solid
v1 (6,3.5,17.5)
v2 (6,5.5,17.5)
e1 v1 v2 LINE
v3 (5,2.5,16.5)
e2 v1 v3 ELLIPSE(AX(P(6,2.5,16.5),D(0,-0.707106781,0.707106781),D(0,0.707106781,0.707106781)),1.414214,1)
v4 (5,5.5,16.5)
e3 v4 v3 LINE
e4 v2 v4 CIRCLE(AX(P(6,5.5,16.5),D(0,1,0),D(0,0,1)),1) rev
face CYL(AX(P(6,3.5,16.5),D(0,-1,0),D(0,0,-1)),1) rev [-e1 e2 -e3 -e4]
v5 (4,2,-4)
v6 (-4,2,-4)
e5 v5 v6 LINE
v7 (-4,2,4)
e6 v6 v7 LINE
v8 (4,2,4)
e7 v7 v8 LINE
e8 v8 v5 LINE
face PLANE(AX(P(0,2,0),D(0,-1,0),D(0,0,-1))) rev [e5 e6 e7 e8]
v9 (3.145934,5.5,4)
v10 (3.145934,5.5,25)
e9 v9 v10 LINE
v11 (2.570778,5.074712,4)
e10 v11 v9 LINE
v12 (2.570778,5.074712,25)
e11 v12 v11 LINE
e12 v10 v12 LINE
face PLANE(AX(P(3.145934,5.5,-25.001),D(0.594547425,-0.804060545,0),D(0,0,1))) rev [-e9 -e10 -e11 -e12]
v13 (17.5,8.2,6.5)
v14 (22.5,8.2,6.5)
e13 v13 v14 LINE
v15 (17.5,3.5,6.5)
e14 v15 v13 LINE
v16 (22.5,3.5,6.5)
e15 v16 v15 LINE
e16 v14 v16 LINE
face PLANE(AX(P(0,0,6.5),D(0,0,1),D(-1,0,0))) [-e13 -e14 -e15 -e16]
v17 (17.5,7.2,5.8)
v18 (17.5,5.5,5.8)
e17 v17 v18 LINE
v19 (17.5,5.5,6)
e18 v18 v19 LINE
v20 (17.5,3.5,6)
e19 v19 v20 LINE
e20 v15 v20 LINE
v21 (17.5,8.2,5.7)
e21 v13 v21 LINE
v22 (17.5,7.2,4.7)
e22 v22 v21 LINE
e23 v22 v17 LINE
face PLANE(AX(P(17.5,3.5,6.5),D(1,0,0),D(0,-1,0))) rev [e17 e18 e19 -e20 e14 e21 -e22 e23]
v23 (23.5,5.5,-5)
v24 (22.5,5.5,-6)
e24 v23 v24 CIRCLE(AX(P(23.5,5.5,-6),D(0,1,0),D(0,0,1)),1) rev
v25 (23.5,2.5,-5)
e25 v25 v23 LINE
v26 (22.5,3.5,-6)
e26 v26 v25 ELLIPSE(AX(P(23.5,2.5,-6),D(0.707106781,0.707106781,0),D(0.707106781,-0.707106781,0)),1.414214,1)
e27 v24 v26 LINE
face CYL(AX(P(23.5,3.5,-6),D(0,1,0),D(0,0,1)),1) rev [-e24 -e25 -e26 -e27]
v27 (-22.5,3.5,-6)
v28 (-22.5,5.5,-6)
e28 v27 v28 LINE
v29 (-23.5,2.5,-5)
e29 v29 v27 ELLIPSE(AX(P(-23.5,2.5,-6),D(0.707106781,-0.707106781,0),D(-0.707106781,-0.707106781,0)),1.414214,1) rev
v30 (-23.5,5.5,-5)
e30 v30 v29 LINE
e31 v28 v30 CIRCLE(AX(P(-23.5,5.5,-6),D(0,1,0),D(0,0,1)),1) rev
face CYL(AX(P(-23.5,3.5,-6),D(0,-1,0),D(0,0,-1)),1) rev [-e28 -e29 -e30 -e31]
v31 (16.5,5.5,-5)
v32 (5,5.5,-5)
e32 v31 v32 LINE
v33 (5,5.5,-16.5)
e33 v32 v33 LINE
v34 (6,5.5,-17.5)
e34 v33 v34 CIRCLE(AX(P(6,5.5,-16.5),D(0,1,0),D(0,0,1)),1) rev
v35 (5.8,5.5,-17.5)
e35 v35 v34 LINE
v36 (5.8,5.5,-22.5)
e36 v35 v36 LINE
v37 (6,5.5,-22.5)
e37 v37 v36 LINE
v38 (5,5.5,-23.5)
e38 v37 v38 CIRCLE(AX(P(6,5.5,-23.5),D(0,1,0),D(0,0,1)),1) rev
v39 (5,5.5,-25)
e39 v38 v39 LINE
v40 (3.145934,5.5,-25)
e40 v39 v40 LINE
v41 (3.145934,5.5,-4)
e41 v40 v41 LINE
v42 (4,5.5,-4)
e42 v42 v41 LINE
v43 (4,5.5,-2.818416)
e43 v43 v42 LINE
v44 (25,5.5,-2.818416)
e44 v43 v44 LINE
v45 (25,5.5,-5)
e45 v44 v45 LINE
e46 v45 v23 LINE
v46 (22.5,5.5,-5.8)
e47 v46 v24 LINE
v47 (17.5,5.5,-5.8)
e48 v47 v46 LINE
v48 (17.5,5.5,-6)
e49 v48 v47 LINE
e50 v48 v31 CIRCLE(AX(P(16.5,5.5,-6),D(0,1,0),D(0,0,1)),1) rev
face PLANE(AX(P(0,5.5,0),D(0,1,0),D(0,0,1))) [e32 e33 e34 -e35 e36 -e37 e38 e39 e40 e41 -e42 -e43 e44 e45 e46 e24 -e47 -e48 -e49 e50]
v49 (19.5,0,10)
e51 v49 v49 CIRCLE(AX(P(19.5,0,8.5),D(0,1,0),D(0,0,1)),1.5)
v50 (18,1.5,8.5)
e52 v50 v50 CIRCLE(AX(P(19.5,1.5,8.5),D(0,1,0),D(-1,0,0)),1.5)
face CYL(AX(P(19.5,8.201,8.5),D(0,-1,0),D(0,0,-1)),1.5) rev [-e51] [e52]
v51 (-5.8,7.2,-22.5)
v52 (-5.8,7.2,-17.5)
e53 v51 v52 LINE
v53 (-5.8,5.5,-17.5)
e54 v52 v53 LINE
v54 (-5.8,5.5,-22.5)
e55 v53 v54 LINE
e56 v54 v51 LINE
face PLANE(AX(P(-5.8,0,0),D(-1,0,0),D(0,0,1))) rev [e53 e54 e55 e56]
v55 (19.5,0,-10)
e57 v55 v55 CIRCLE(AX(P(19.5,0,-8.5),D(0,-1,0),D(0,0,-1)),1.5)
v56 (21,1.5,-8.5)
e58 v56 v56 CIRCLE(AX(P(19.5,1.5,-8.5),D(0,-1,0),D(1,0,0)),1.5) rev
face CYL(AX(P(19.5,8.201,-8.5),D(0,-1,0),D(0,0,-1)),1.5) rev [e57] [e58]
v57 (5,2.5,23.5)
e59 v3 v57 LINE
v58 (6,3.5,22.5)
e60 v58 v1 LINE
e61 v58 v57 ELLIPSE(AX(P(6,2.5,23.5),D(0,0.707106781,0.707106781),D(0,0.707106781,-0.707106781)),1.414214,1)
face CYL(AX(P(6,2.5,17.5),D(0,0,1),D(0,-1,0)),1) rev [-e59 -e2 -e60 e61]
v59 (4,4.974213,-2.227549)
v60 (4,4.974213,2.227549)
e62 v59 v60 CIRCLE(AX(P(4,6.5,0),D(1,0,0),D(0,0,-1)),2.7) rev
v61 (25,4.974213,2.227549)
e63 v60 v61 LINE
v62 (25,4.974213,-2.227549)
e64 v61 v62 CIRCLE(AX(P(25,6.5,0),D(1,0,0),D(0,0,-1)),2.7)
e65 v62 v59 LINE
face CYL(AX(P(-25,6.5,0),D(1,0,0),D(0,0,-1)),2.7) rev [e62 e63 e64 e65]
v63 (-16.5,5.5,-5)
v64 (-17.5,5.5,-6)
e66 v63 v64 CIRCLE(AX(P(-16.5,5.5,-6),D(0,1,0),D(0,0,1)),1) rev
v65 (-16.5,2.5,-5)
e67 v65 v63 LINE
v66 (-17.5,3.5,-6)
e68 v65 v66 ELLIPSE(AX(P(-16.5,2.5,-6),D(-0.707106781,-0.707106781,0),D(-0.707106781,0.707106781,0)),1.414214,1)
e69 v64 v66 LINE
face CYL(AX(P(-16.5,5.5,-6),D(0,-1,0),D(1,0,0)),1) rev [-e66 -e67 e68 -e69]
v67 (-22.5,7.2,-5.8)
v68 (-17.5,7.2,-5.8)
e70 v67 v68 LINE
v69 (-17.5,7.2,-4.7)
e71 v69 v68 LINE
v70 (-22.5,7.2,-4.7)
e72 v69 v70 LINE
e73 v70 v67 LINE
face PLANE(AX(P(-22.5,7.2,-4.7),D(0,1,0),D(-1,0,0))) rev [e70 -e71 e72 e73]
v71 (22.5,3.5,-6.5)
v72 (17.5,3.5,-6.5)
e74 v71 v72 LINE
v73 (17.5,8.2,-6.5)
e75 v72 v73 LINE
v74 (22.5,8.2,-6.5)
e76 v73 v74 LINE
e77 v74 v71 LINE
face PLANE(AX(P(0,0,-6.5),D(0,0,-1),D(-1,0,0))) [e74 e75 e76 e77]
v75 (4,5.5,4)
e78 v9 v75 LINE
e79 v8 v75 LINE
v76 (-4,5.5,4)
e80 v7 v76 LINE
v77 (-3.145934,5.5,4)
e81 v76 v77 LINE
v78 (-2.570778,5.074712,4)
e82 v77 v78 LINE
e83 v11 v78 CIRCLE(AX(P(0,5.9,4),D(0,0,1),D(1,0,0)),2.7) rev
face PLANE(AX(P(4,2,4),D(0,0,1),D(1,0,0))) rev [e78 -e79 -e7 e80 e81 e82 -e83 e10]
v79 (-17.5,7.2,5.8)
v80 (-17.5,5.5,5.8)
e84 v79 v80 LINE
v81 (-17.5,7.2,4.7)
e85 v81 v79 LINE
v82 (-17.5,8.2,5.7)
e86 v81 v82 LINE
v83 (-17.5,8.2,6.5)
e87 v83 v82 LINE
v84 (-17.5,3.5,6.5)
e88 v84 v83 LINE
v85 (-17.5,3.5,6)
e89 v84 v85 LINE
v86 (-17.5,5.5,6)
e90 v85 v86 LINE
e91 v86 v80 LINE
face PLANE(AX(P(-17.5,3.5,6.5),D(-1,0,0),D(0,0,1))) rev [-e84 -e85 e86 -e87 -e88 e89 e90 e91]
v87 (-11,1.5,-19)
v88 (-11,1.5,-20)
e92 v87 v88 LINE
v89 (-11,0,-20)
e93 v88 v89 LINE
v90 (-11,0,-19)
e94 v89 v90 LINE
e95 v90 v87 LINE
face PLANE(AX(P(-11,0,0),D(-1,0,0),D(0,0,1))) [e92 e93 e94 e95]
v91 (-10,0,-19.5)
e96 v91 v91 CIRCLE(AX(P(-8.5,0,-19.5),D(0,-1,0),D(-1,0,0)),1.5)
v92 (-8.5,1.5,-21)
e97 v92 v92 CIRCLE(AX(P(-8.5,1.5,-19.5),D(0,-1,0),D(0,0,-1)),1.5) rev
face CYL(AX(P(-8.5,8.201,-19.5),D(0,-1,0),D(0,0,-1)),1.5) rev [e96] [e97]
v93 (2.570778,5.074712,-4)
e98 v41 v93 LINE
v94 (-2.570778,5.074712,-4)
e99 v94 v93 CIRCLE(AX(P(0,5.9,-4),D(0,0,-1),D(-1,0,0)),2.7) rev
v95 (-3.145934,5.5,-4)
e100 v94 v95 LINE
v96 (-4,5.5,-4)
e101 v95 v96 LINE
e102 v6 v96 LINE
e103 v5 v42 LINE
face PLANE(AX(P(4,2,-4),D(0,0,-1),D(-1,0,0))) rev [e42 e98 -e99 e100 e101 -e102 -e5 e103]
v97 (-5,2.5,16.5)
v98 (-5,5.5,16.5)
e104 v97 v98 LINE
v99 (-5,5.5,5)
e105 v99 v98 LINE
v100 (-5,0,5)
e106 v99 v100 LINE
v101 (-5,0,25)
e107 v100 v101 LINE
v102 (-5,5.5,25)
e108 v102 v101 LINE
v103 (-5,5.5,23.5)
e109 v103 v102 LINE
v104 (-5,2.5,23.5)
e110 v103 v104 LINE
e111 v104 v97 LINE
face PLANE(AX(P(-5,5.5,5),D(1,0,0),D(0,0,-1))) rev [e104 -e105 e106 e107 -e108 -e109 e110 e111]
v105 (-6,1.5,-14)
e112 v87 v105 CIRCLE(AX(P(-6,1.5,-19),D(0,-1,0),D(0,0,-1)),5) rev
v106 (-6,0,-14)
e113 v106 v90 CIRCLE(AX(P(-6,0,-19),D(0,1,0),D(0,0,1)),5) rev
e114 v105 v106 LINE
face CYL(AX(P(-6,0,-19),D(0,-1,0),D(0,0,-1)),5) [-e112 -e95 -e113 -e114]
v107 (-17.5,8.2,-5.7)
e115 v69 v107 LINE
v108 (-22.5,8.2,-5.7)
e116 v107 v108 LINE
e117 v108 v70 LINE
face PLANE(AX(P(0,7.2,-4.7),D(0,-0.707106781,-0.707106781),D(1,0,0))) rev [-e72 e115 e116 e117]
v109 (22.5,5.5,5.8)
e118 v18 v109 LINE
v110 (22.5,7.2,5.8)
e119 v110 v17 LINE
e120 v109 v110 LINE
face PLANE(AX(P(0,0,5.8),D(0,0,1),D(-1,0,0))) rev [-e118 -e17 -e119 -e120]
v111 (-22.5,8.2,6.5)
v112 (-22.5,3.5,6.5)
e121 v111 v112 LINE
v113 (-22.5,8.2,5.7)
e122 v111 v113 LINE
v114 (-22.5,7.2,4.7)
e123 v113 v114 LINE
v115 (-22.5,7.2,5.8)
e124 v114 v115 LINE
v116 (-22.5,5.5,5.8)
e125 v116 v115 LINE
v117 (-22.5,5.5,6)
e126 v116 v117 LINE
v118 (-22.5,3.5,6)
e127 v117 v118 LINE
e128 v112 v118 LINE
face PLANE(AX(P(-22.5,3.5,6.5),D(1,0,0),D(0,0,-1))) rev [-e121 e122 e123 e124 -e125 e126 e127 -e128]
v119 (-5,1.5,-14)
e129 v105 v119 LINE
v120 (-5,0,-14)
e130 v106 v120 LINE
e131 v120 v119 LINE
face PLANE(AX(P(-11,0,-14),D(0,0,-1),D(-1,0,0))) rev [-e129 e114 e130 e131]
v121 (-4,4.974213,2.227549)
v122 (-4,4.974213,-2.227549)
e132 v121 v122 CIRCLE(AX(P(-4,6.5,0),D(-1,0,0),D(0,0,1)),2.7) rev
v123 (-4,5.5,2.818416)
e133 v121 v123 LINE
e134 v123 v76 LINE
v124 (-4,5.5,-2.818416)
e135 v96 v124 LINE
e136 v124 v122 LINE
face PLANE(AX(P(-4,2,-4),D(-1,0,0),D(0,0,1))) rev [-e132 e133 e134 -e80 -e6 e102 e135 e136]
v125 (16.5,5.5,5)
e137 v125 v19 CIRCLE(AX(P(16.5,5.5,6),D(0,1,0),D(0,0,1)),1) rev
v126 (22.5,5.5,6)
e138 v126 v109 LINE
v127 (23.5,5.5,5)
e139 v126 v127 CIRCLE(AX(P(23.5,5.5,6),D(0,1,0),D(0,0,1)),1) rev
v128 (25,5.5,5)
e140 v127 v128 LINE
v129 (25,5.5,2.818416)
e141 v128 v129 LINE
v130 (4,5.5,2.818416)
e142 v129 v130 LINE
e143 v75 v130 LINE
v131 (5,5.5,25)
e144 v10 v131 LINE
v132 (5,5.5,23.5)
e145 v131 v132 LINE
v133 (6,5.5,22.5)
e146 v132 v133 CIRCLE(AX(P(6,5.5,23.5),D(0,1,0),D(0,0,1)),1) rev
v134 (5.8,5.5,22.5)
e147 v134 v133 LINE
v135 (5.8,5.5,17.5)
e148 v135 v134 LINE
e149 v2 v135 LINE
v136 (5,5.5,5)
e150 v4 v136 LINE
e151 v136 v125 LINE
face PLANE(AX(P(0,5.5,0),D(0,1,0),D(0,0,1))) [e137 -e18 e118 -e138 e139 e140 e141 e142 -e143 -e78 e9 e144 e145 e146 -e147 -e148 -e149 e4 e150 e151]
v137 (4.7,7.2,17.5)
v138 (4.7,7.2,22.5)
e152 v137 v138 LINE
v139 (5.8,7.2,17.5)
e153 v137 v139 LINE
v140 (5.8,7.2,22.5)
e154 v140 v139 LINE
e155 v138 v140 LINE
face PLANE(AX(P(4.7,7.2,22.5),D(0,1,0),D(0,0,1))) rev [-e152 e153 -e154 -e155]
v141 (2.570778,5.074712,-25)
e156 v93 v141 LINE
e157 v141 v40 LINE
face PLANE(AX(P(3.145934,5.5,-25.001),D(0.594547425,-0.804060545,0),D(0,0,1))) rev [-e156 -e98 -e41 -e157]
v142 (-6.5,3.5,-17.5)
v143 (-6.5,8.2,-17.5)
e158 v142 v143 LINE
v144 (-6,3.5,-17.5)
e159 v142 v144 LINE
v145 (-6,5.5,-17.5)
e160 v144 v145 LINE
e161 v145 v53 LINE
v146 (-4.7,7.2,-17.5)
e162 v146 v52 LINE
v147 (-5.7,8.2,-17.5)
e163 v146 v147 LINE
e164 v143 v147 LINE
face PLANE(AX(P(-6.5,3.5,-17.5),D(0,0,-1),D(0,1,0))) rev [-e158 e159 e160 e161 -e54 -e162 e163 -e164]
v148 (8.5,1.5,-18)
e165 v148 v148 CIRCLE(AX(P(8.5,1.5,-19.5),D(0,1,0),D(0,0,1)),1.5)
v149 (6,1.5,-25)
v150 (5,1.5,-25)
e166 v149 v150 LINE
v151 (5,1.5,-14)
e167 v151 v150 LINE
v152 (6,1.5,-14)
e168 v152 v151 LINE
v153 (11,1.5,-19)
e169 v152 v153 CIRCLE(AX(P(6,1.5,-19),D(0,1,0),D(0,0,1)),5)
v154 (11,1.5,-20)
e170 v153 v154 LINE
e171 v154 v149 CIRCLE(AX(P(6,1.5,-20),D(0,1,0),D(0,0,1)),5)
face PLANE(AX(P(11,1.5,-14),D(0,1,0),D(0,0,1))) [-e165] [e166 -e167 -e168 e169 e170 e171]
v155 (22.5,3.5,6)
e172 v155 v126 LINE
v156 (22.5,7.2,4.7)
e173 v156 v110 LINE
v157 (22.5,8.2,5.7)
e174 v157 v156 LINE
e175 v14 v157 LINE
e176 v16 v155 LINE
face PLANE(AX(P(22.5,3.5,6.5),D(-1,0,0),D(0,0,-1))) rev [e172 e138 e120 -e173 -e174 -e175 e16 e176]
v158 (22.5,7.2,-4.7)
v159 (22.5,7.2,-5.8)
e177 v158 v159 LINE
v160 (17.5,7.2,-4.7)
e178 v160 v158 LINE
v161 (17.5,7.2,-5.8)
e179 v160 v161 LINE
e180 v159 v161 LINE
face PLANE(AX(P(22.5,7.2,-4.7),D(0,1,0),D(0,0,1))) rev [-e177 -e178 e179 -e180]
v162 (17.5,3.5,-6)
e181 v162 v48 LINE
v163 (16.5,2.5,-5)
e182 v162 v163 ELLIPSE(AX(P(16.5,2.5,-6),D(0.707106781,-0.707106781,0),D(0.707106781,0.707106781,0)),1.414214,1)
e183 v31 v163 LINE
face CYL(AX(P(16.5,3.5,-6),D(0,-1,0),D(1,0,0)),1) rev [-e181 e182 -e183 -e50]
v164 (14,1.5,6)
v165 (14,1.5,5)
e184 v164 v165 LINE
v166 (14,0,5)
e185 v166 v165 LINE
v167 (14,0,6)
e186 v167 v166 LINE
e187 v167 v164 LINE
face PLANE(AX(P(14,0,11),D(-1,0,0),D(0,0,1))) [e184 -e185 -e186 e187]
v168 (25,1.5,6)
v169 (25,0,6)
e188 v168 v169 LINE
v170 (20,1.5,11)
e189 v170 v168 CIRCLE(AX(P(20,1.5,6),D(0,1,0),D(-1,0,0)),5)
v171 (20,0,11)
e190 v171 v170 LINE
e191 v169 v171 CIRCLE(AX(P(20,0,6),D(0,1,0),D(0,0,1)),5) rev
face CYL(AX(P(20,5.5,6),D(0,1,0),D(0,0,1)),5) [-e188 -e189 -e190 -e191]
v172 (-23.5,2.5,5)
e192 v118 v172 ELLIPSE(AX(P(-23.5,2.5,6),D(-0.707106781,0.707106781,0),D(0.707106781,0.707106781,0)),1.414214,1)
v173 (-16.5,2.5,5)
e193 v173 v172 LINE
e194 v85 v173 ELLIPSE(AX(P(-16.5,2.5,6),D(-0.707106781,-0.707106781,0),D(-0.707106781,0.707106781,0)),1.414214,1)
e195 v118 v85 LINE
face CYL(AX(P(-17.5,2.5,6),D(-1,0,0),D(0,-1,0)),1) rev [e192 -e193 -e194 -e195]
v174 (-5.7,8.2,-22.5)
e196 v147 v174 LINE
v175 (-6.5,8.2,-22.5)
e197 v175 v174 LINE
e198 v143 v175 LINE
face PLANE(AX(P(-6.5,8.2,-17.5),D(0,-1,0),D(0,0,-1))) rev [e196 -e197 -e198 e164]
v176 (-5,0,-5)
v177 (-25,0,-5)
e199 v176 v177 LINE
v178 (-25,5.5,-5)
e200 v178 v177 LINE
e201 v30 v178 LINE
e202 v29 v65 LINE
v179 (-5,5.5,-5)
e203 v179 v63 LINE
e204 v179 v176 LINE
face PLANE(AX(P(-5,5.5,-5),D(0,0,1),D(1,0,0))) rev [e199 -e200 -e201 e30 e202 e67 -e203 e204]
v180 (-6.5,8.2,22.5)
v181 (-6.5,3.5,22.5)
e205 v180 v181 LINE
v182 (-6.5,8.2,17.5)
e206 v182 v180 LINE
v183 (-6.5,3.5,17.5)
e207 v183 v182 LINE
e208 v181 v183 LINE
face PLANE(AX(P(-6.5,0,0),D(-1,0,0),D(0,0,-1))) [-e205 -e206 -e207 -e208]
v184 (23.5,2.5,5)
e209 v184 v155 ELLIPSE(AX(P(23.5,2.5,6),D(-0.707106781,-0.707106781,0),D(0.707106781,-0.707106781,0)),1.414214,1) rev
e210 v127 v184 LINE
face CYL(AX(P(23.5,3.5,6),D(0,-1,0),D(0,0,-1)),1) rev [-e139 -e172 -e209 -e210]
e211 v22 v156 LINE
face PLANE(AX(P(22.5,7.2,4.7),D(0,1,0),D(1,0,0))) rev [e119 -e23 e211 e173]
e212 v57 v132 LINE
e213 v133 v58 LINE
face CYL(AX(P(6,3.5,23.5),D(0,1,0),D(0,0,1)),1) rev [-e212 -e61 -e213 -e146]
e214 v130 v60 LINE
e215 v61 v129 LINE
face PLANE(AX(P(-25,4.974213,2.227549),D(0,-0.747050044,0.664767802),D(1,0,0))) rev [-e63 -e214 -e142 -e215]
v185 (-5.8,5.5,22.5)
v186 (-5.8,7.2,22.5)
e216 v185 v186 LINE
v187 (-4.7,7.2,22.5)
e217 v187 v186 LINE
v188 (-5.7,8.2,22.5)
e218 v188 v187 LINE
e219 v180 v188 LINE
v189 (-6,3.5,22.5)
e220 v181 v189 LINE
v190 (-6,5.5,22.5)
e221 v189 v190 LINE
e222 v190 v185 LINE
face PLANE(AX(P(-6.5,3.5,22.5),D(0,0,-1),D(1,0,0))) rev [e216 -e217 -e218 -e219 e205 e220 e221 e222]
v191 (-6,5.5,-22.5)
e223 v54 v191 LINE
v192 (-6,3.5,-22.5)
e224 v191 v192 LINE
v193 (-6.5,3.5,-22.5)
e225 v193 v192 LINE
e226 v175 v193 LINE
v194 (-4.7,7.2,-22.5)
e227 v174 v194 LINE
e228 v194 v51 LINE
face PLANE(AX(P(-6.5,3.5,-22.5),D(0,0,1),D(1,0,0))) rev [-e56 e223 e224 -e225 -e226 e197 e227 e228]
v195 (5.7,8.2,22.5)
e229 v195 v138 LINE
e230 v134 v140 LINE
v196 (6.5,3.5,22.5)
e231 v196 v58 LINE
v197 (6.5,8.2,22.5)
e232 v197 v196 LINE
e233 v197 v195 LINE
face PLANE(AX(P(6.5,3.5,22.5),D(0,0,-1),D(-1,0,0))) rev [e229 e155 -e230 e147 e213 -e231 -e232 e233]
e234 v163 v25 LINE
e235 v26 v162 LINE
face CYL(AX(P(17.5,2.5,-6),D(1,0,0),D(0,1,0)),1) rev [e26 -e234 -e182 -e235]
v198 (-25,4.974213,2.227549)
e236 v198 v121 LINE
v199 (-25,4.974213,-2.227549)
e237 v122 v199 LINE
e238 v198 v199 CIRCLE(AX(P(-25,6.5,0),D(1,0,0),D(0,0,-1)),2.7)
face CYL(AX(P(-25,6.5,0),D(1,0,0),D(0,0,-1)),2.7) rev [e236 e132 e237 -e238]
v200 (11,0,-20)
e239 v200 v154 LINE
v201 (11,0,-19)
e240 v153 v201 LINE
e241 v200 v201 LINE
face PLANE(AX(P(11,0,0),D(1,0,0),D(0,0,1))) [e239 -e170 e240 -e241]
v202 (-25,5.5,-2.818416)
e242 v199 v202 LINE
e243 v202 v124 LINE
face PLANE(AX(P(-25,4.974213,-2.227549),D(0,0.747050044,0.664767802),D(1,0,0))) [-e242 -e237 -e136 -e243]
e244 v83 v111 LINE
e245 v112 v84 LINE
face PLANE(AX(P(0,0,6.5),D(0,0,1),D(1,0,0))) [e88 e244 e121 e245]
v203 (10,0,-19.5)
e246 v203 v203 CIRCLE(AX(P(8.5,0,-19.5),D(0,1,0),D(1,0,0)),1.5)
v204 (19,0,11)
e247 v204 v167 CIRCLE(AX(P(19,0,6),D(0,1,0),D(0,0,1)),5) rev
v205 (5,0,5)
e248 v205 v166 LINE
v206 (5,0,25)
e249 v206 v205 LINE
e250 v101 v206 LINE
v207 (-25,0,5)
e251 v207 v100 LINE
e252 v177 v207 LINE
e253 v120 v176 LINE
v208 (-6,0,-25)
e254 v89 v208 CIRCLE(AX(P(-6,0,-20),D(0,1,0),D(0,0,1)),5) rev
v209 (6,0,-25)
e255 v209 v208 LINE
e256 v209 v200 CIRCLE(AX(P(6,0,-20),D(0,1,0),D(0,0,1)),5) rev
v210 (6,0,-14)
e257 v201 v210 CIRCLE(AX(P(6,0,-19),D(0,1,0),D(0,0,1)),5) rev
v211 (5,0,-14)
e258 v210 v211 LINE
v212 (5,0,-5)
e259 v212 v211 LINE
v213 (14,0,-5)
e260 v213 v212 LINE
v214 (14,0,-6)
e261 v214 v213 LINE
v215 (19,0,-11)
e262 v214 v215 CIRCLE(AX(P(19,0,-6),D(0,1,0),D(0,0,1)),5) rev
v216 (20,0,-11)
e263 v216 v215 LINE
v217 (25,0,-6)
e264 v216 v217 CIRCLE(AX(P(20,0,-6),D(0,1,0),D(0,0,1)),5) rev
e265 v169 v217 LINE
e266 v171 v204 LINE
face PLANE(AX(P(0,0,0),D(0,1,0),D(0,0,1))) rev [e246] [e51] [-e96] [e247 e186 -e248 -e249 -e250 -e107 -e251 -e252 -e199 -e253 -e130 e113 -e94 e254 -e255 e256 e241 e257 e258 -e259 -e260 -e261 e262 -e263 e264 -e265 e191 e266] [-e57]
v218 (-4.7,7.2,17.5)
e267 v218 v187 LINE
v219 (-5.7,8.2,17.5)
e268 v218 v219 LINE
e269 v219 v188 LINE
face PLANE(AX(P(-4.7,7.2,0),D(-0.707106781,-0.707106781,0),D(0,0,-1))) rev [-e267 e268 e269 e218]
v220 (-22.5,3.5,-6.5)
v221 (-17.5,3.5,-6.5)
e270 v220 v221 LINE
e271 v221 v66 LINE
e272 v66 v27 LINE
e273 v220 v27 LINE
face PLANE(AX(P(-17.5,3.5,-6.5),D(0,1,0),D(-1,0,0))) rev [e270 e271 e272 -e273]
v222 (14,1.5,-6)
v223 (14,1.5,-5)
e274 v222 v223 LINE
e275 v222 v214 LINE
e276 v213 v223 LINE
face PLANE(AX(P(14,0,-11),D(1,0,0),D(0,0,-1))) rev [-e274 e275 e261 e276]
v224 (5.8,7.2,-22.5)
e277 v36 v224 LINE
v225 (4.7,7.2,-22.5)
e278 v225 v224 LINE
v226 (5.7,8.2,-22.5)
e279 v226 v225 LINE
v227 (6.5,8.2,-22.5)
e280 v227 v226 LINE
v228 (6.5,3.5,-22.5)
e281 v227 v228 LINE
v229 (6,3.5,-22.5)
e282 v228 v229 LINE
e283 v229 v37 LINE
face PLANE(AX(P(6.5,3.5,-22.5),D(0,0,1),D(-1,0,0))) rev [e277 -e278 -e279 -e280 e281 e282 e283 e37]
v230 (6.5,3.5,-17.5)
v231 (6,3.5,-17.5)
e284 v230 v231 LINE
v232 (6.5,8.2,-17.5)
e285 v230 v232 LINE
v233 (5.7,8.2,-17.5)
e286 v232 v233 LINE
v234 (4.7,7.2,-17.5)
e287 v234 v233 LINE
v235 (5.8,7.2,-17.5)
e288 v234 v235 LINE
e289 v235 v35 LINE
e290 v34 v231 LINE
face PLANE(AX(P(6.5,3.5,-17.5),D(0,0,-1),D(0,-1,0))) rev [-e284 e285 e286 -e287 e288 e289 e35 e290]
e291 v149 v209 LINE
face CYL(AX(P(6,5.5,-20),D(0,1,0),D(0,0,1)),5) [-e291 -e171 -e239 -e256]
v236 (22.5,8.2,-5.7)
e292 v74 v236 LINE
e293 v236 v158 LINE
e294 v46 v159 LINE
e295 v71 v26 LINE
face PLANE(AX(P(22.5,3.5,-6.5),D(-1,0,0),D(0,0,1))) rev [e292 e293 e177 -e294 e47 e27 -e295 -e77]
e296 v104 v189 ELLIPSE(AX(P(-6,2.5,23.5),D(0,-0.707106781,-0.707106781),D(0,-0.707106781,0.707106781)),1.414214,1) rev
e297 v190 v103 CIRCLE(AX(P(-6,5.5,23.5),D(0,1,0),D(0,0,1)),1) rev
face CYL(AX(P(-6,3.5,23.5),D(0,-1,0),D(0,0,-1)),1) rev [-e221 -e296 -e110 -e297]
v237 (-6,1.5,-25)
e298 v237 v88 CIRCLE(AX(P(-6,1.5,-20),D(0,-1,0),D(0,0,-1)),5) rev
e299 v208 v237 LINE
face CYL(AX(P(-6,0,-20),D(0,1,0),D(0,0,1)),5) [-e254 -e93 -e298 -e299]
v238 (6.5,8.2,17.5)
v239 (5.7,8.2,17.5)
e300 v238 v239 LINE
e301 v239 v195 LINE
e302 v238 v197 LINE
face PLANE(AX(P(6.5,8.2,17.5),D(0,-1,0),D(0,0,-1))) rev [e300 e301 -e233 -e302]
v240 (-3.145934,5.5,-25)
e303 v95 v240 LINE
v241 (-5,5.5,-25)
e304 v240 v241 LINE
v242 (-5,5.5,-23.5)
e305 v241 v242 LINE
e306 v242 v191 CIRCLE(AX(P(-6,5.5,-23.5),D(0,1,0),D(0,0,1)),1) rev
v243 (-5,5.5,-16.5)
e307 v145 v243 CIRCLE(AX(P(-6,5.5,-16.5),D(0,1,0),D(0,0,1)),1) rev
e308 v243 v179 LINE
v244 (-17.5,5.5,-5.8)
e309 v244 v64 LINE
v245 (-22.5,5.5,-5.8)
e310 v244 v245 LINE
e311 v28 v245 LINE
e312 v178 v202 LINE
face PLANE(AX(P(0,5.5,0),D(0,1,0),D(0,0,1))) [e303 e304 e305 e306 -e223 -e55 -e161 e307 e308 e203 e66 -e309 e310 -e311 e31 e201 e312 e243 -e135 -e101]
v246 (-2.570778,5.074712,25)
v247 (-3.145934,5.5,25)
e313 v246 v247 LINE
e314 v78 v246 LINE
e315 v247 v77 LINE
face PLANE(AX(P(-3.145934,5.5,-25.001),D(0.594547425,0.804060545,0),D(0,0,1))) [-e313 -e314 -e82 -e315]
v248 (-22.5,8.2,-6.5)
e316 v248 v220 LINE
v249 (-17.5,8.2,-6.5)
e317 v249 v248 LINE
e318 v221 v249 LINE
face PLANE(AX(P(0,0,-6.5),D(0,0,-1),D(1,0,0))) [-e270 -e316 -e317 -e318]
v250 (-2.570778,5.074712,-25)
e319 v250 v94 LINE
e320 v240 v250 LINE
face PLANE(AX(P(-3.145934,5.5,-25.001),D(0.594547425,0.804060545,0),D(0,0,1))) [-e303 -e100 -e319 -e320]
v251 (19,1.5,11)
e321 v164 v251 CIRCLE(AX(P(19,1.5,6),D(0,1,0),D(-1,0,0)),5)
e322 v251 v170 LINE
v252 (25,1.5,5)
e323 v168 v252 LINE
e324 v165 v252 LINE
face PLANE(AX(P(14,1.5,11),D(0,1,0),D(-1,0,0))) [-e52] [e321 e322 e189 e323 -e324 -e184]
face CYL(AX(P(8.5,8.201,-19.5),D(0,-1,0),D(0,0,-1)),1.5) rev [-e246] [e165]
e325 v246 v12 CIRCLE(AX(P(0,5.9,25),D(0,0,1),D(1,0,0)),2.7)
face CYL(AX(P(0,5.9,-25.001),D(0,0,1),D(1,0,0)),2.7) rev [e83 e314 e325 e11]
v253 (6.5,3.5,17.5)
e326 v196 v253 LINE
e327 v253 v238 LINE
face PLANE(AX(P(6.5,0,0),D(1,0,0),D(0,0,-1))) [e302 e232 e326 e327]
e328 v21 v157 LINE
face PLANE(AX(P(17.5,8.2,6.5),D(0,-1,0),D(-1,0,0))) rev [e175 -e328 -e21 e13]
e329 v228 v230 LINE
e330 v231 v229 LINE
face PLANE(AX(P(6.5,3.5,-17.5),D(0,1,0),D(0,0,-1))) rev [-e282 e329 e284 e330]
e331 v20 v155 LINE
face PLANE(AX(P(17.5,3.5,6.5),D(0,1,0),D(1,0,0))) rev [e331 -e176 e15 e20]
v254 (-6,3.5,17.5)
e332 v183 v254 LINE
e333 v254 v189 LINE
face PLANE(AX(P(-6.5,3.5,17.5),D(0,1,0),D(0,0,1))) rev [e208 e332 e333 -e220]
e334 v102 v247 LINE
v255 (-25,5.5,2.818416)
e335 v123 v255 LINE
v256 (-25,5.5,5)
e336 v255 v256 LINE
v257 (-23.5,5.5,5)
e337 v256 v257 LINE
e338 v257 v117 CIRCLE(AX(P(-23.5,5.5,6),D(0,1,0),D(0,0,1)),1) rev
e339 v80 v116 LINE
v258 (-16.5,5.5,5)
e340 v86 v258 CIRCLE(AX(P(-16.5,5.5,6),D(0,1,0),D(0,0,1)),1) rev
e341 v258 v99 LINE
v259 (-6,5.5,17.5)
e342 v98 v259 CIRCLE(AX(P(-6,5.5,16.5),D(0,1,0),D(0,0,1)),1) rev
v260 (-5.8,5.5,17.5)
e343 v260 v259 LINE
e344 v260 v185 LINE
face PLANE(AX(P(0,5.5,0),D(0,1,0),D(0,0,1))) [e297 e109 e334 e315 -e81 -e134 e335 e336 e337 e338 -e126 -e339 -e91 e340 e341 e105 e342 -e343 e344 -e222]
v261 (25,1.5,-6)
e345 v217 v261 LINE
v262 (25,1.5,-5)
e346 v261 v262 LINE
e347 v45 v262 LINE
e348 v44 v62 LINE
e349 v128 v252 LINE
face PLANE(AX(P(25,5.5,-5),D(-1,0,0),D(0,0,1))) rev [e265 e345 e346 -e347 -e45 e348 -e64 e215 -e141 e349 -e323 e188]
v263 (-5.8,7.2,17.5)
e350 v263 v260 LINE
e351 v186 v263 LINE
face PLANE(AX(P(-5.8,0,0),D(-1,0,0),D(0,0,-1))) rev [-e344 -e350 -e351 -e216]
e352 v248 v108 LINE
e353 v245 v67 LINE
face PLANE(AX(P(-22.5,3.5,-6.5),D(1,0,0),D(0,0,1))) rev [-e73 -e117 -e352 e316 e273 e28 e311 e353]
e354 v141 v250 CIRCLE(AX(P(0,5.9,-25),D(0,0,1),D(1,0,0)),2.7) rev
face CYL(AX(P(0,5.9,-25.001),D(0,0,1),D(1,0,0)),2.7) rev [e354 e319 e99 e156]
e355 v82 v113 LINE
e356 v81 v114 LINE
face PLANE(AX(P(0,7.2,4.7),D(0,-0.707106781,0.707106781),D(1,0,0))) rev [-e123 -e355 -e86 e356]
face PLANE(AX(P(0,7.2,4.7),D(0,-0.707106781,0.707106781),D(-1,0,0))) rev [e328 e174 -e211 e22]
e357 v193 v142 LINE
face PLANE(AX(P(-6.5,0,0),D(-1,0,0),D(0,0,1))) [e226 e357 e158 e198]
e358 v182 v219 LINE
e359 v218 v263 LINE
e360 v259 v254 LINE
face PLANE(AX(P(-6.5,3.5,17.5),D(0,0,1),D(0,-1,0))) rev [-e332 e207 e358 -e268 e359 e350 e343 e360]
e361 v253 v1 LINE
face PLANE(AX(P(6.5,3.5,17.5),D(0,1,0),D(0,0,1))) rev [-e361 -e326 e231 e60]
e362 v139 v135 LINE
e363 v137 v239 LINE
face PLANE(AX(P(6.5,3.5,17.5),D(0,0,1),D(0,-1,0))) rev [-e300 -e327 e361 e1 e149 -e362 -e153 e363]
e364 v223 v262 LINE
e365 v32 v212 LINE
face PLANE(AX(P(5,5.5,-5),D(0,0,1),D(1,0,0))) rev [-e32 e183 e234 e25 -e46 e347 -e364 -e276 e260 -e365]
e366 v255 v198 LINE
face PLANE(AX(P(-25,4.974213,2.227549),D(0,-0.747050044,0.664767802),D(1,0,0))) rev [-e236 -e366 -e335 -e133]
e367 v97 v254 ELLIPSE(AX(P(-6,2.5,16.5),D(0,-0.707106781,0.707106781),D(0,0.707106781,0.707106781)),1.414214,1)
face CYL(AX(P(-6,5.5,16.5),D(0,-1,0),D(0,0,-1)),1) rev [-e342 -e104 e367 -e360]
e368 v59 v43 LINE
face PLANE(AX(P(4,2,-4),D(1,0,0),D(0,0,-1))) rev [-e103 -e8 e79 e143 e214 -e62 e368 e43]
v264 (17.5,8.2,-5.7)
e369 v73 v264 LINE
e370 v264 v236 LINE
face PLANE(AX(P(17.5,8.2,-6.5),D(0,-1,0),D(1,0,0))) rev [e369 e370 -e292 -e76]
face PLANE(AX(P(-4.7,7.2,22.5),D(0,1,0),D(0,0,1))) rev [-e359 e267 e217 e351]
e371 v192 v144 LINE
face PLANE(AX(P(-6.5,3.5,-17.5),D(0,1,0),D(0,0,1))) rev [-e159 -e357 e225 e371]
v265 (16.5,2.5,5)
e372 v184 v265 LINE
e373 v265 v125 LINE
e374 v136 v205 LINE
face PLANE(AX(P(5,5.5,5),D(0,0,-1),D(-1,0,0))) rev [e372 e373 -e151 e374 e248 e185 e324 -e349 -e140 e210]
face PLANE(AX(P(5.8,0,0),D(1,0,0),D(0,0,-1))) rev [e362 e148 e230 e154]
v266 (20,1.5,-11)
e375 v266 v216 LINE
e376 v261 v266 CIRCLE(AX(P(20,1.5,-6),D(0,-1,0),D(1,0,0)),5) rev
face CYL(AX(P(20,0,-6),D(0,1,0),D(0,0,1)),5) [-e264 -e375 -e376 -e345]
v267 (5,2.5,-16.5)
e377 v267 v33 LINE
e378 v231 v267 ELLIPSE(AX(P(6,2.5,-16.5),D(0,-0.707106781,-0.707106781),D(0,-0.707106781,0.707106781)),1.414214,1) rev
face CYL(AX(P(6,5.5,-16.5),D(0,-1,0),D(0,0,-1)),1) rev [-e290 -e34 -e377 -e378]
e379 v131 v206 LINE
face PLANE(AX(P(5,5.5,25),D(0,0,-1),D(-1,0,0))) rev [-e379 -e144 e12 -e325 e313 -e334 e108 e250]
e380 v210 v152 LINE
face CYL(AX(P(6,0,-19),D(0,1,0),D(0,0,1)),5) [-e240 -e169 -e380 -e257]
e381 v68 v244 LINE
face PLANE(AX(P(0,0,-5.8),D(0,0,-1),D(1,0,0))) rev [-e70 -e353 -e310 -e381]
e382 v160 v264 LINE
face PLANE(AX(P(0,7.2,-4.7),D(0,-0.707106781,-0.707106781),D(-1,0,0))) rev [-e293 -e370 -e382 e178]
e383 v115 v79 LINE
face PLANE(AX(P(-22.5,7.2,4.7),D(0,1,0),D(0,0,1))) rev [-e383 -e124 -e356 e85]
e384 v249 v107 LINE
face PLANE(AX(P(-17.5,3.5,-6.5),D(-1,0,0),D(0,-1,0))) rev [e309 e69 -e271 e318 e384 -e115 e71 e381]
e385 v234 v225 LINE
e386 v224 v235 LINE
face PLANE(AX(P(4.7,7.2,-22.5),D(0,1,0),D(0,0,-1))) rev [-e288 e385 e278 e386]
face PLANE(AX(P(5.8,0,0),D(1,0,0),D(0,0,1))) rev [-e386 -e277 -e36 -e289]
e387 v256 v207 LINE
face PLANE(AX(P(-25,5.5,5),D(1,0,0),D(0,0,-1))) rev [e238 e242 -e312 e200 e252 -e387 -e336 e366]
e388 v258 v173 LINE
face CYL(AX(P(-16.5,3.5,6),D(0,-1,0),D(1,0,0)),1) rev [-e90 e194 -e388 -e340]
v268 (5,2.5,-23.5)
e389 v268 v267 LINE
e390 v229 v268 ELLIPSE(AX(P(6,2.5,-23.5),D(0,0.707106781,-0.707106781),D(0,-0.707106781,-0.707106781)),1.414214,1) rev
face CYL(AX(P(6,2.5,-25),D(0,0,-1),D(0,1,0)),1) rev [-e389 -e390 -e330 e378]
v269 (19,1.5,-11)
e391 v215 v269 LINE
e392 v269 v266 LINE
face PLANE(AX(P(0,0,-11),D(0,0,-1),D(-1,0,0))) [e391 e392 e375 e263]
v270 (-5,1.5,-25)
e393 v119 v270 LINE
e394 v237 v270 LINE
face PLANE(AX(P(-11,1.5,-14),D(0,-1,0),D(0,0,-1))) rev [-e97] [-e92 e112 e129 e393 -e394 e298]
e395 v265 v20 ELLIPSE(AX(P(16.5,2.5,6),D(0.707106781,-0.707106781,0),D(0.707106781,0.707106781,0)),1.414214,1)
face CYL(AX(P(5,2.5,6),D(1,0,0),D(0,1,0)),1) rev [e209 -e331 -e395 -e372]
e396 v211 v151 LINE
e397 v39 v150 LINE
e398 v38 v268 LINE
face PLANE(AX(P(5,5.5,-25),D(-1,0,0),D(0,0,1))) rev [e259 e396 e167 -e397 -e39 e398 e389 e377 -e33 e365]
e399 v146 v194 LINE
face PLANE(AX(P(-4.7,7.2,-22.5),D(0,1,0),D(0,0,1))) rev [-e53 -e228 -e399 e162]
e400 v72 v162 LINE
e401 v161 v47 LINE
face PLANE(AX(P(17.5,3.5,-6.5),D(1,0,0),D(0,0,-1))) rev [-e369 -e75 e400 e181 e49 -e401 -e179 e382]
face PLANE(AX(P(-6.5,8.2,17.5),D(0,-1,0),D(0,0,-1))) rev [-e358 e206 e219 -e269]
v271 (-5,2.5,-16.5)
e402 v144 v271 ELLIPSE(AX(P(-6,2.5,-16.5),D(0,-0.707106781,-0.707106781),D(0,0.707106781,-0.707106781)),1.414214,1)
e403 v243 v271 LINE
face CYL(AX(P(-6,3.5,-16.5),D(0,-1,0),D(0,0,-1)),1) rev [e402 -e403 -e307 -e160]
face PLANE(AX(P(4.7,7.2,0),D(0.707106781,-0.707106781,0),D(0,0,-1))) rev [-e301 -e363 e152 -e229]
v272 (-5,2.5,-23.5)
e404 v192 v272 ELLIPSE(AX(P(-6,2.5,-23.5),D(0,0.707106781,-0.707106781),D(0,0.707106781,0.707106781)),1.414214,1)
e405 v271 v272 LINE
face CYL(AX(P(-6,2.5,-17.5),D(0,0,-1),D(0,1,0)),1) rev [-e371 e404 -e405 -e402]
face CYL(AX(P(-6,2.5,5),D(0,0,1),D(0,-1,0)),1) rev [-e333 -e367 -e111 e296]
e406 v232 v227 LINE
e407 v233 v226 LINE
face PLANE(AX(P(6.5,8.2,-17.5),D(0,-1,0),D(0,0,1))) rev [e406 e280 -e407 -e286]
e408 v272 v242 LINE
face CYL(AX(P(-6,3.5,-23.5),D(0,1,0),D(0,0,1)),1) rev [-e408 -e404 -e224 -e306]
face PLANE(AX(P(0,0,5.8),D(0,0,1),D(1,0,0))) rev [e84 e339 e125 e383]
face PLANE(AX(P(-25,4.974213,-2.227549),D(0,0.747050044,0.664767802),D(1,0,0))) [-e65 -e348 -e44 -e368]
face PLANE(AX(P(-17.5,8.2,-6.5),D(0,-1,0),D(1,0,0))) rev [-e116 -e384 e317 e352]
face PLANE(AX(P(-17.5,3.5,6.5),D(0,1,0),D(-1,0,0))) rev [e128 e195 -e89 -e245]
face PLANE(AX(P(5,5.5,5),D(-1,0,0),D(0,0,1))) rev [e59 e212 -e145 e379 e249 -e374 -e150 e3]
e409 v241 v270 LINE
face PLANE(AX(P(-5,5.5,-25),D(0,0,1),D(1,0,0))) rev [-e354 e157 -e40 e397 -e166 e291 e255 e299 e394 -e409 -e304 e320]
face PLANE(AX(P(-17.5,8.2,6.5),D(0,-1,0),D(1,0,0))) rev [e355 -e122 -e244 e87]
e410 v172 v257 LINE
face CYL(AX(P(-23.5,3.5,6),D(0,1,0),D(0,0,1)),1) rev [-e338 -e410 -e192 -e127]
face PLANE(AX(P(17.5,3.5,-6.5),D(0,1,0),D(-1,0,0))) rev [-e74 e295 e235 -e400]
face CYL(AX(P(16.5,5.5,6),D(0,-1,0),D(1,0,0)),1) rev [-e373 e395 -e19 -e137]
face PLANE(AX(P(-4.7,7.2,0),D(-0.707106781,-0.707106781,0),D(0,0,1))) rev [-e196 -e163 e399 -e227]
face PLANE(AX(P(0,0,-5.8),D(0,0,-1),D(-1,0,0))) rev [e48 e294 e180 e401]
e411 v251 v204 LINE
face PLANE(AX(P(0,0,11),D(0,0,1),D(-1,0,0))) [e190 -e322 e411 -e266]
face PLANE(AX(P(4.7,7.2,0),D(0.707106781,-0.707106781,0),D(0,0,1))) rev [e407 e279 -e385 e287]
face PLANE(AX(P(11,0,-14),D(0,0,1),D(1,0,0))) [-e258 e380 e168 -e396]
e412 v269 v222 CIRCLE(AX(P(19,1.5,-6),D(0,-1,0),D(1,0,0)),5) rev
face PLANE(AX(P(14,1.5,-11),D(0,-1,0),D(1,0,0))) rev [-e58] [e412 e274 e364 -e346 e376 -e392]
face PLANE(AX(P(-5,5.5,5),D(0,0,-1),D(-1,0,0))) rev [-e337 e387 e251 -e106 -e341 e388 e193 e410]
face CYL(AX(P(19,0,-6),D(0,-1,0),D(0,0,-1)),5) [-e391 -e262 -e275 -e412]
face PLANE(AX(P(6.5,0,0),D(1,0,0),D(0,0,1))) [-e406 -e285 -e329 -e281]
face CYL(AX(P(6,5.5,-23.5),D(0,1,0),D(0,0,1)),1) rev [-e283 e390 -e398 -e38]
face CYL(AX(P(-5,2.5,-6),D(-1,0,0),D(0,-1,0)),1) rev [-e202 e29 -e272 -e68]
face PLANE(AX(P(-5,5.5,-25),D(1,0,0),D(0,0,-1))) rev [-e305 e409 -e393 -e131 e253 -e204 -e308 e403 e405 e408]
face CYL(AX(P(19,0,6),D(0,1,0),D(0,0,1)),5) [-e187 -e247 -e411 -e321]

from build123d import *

# Parameters (mm, degrees)
BOSS_EXTRUDE5_DEPTH          = 5.5
CUT_EXTRUDE1_REACH           = 58.172
SKETCH4_R                    = 2.7
SKETCH5_R                    = 2.7
CUT_EXTRUDE2_DEPTH           = 57.171612047
SKETCH6_W                    = 8
SKETCH6_H                    = 8
CUT_EXTRUDE3_DEPTH           = 3.5
SKETCH7_W                    = 5
SKETCH7_H                    = 4.7
BOSS_EXTRUDE6_DEPTH          = 1.5
SKETCH8_W                    = 5
SKETCH8_H                    = 1
BOSS_EXTRUDE7_DEPTH          = 0.3
CHAMFER1_SIZE                = 1
CHAMFER1_OF_MIRROR2_SIZE     = 1
FILLET2_R                    = 1
SKETCH13_W                   = 5
SKETCH13_H                   = 1.7
CUT_EXTRUDE6_DEPTH           = 0.8
SKETCH9_W                    = 11
SKETCH9_H                    = 1.5
BOSS_EXTRUDE8_DEPTH          = 6
CUT_EXTRUDE5_REACH           = 38.294
SKETCH11_R                   = 1.5
CIRPATTERN12_COUNT           = 2
CIRPATTERN12_ANGLE           = 90
CIRPATTERN12_COPY_1_SKETCH_W = 11
CIRPATTERN12_COPY_1_SKETCH_H = 1.5
CIRPATTERN12_COPY_1_DEPTH    = 6
CIRPATTERN12_COPY_2_REACH    = 38.294
CIRPATTERN12_COPY_2_SKETCH_R = 1.5
FILLET4_R                    = 5
CIRPATTERN14_COUNT           = 4
CIRPATTERN14_COPY_1_SKETCH_W = 5
CIRPATTERN14_COPY_1_SKETCH_H = 1.7
CIRPATTERN14_COPY_1_DEPTH    = 0.8
CIRPATTERN14_COPY_2_SKETCH_W = 5
CIRPATTERN14_COPY_2_SKETCH_H = 1.7
CIRPATTERN14_COPY_2_DEPTH    = 0.8
CIRPATTERN14_COPY_3_SKETCH_W = 5
CIRPATTERN14_COPY_3_SKETCH_H = 1.7
CIRPATTERN14_COPY_3_DEPTH    = 0.8
CHAMFER2_START               = -26
CHAMFER2_DEPTH               = 52
CHAMFER2_2_DEPTH             = 52


with BuildPart() as part:
    # Sketch3 → Boss-Extrude5 (new body)
    with BuildSketch(Plane(origin=(0, 0, 0), x_dir=(1, 0, 0), z_dir=(0, 1, 0))):
        Polygon((5, 5), (25, 5), (25, -5), (5, -5), (5, -25), (-5, -25), (-5, -5), (-25, -5), (-25, 5), (-5, 5), (-5, 25), (5, 25), align=None)
    extrude(amount=BOSS_EXTRUDE5_DEPTH)

    # Sketch4 → Cut-Extrude1 (cut, up to next)
    with BuildSketch(Plane.XY.offset(25), mode=Mode.PRIVATE) as cut_extrude1_sk1:
        with Locations((0, 5.9)):
            Circle(SKETCH4_R)
    cut_extrude1_tool1 = extrude(cut_extrude1_sk1.sketch, amount=-CUT_EXTRUDE1_REACH, mode=Mode.PRIVATE) & part.part
    add(cut_extrude1_tool1.solids().sort_by_distance((0, 5.9, 25))[0], mode=Mode.SUBTRACT)

    # Sketch5 → Cut-Extrude2 (cut, through all)
    with BuildSketch(Plane(origin=(25, 0, 0), x_dir=(0, 0, -1), z_dir=(1, 0, 0))):
        with Locations((0, 6.5)):
            Circle(SKETCH5_R)
    extrude(amount=-CUT_EXTRUDE2_DEPTH, mode=Mode.SUBTRACT)

    # Sketch6 → Cut-Extrude3 (cut)
    with BuildSketch(Plane(origin=(0, 5.5, 0), x_dir=(1, 0, 0), z_dir=(0, 1, 0))):
        Rectangle(SKETCH6_W, SKETCH6_H)
    extrude(amount=-CUT_EXTRUDE3_DEPTH, mode=Mode.SUBTRACT)

    # Sketch7 → Boss-Extrude6 (add)
    with BuildSketch(Plane(origin=(5, 0, 0), x_dir=(0, 0, -1), z_dir=(1, 0, 0))):
        with Locations((-20, 5.85)):
            Rectangle(SKETCH7_W, SKETCH7_H)
    boss_extrude6 = extrude(amount=BOSS_EXTRUDE6_DEPTH)

    # Sketch8 → Boss-Extrude7 (add)
    with BuildSketch(Plane.ZY.offset(-5)):
        with Locations((20, 7.7)):
            Rectangle(SKETCH8_W, SKETCH8_H)
    boss_extrude7 = extrude(amount=BOSS_EXTRUDE7_DEPTH)

    # Chamfer1
    chamfer1_edges = [part.edges().sort_by_distance(p)[0] for p in [
        (4.7, 8.2, 20),
    ]]
    chamfer(chamfer1_edges, length=CHAMFER1_SIZE - 0.0001)  # a hair under: the kernel refuses the full size

    # Mirror2: Boss-Extrude6, Boss-Extrude7 across plane
    add(boss_extrude6.mirror(Plane(origin=(0, 0, 0), x_dir=(0, 0, 1), z_dir=(1, 0, 0))))
    add(boss_extrude7.mirror(Plane(origin=(0, 0, 0), x_dir=(0, 0, 1), z_dir=(1, 0, 0))))

    # Chamfer1 of Mirror2
    chamfer1_of_mirror2_edges = [part.edges().sort_by_distance(p)[0] for p in [
        (-4.7, 8.2, 20),
    ]]
    chamfer(chamfer1_of_mirror2_edges, length=CHAMFER1_OF_MIRROR2_SIZE - 0.0001)  # a hair under: the kernel refuses the full size

    # CirPattern6: read off the stored shape, not the designer's step
    # CirPattern6: loft between two sections, ruled curve by curve
    cirpattern6_from = [
        Edge.make_line((-17.5, 7.2, 5), (-17.5, 5.5, 5)),
        Edge.make_line((-17.5, 8.2, 6.5), (-17.5, 8.2, 5.7)),
        Edge.make_line((-17.5, 3.5, 5), (-17.5, 3.5, 6.5)),
        Edge.make_line((-17.5, 7.2, 5), (-17.5, 7.2, 4.7)),
        Edge.make_line((-17.5, 3.5, 6.5), (-17.5, 8.2, 6.5)),
        Edge.make_line((-17.5, 8.2, 5.7), (-17.5, 7.2, 4.7)),
        Edge.make_line((-17.5, 3.5, 5), (-17.5, 5.5, 5)),
    ]
    cirpattern6_to = [
        Edge.make_line((-22.5, 7.2, 5), (-22.5, 5.5, 5)),
        Edge.make_line((-22.5, 8.2, 6.5), (-22.5, 8.2, 5.7)),
        Edge.make_line((-22.5, 3.5, 5), (-22.5, 3.5, 6.5)),
        Edge.make_line((-22.5, 7.2, 5), (-22.5, 7.2, 4.7)),
        Edge.make_line((-22.5, 3.5, 6.5), (-22.5, 8.2, 6.5)),
        Edge.make_line((-22.5, 8.2, 5.7), (-22.5, 7.2, 4.7)),
        Edge.make_line((-22.5, 3.5, 5), (-22.5, 5.5, 5)),
    ]
    cirpattern6 = Solid(Shell([*[Face.make_surface_from_curves(cirpattern6_from[k], cirpattern6_to[k]) for k in range(7)], Face(Wire(cirpattern6_from)), Face(Wire(cirpattern6_to))]))
    add(cirpattern6)

    # CirPattern6 2: loft between two sections, ruled curve by curve
    cirpattern6_2_from = [
        Edge.make_line((22.5, 5.5, 5), (22.5, 7.2, 5)),
        Edge.make_line((22.5, 8.2, 6.5), (22.5, 8.2, 5.7)),
        Edge.make_line((22.5, 3.5, 5), (22.5, 3.5, 6.5)),
        Edge.make_line((22.5, 7.2, 5), (22.5, 7.2, 4.7)),
        Edge.make_line((22.5, 3.5, 6.5), (22.5, 8.2, 6.5)),
        Edge.make_line((22.5, 7.2, 4.7), (22.5, 8.2, 5.7)),
        Edge.make_line((22.5, 3.5, 5), (22.5, 5.5, 5)),
    ]
    cirpattern6_2_to = [
        Edge.make_line((17.5, 5.5, 5), (17.5, 7.2, 5)),
        Edge.make_line((17.5, 8.2, 6.5), (17.5, 8.2, 5.7)),
        Edge.make_line((17.5, 3.5, 5), (17.5, 3.5, 6.5)),
        Edge.make_line((17.5, 7.2, 5), (17.5, 7.2, 4.7)),
        Edge.make_line((17.5, 3.5, 6.5), (17.5, 8.2, 6.5)),
        Edge.make_line((17.5, 7.2, 4.7), (17.5, 8.2, 5.7)),
        Edge.make_line((17.5, 3.5, 5), (17.5, 5.5, 5)),
    ]
    cirpattern6_2 = Solid(Shell([*[Face.make_surface_from_curves(cirpattern6_2_from[k], cirpattern6_2_to[k]) for k in range(7)], Face(Wire(cirpattern6_2_from)), Face(Wire(cirpattern6_2_to))]))
    add(cirpattern6_2)

    # CirPattern6 3: loft between two sections, ruled curve by curve
    cirpattern6_3_from = [
        Edge.make_line((-5, 7.2, -22.5), (-5, 5.5, -22.5)),
        Edge.make_line((-5.7, 8.2, -22.5), (-6.5, 8.2, -22.5)),
        Edge.make_line((-5, 3.5, -22.5), (-6.5, 3.5, -22.5)),
        Edge.make_line((-5, 7.2, -22.5), (-4.7, 7.2, -22.5)),
        Edge.make_line((-6.5, 8.2, -22.5), (-6.5, 3.5, -22.5)),
        Edge.make_line((-4.7, 7.2, -22.5), (-5.7, 8.2, -22.5)),
        Edge.make_line((-5, 3.5, -22.5), (-5, 5.5, -22.5)),
    ]
    cirpattern6_3_to = [
        Edge.make_line((-5, 7.2, -17.5), (-5, 5.5, -17.5)),
        Edge.make_line((-5.7, 8.2, -17.5), (-6.5, 8.2, -17.5)),
        Edge.make_line((-5, 3.5, -17.5), (-6.5, 3.5, -17.5)),
        Edge.make_line((-5, 7.2, -17.5), (-4.7, 7.2, -17.5)),
        Edge.make_line((-6.5, 8.2, -17.5), (-6.5, 3.5, -17.5)),
        Edge.make_line((-4.7, 7.2, -17.5), (-5.7, 8.2, -17.5)),
        Edge.make_line((-5, 3.5, -17.5), (-5, 5.5, -17.5)),
    ]
    cirpattern6_3 = Solid(Shell([*[Face.make_surface_from_curves(cirpattern6_3_from[k], cirpattern6_3_to[k]) for k in range(7)], Face(Wire(cirpattern6_3_from)), Face(Wire(cirpattern6_3_to))]))
    add(cirpattern6_3)

    # CirPattern6 4: loft between two sections, ruled curve by curve
    cirpattern6_4_from = [
        Edge.make_line((22.5, 7.2, -5), (22.5, 5.5, -5)),
        Edge.make_line((22.5, 8.2, -5.7), (22.5, 8.2, -6.5)),
        Edge.make_line((22.5, 3.5, -5), (22.5, 3.5, -6.5)),
        Edge.make_line((22.5, 7.2, -5), (22.5, 7.2, -4.7)),
        Edge.make_line((22.5, 8.2, -6.5), (22.5, 3.5, -6.5)),
        Edge.make_line((22.5, 7.2, -4.7), (22.5, 8.2, -5.7)),
        Edge.make_line((22.5, 3.5, -5), (22.5, 5.5, -5)),
    ]
    cirpattern6_4_to = [
        Edge.make_line((17.5, 7.2, -5), (17.5, 5.5, -5)),
        Edge.make_line((17.5, 8.2, -5.7), (17.5, 8.2, -6.5)),
        Edge.make_line((17.5, 3.5, -5), (17.5, 3.5, -6.5)),
        Edge.make_line((17.5, 7.2, -5), (17.5, 7.2, -4.7)),
        Edge.make_line((17.5, 8.2, -6.5), (17.5, 3.5, -6.5)),
        Edge.make_line((17.5, 7.2, -4.7), (17.5, 8.2, -5.7)),
        Edge.make_line((17.5, 3.5, -5), (17.5, 5.5, -5)),
    ]
    cirpattern6_4 = Solid(Shell([*[Face.make_surface_from_curves(cirpattern6_4_from[k], cirpattern6_4_to[k]) for k in range(7)], Face(Wire(cirpattern6_4_from)), Face(Wire(cirpattern6_4_to))]))
    add(cirpattern6_4)

    # CirPattern6 5: loft between two sections, ruled curve by curve
    cirpattern6_5_from = [
        Edge.make_line((-17.5, 5.5, -5), (-17.5, 7.2, -5)),
        Edge.make_line((-17.5, 8.2, -6.5), (-17.5, 8.2, -5.7)),
        Edge.make_line((-17.5, 3.5, -5), (-17.5, 3.5, -6.5)),
        Edge.make_line((-17.5, 7.2, -5), (-17.5, 7.2, -4.7)),
        Edge.make_line((-17.5, 3.5, -6.5), (-17.5, 8.2, -6.5)),
        Edge.make_line((-17.5, 7.2, -4.7), (-17.5, 8.2, -5.7)),
        Edge.make_line((-17.5, 3.5, -5), (-17.5, 5.5, -5)),
    ]
    cirpattern6_5_to = [
        Edge.make_line((-22.5, 5.5, -5), (-22.5, 7.2, -5)),
        Edge.make_line((-22.5, 8.2, -6.5), (-22.5, 8.2, -5.7)),
        Edge.make_line((-22.5, 3.5, -5), (-22.5, 3.5, -6.5)),
        Edge.make_line((-22.5, 7.2, -5), (-22.5, 7.2, -4.7)),
        Edge.make_line((-22.5, 3.5, -6.5), (-22.5, 8.2, -6.5)),
        Edge.make_line((-22.5, 7.2, -4.7), (-22.5, 8.2, -5.7)),
        Edge.make_line((-22.5, 3.5, -5), (-22.5, 5.5, -5)),
    ]
    cirpattern6_5 = Solid(Shell([*[Face.make_surface_from_curves(cirpattern6_5_from[k], cirpattern6_5_to[k]) for k in range(7)], Face(Wire(cirpattern6_5_from)), Face(Wire(cirpattern6_5_to))]))
    add(cirpattern6_5)

    # CirPattern6 6: loft between two sections, ruled curve by curve
    cirpattern6_6_from = [
        Edge.make_line((5, 5.5, -22.5), (5, 7.2, -22.5)),
        Edge.make_line((6.5, 8.2, -22.5), (5.7, 8.2, -22.5)),
        Edge.make_line((5, 3.5, -22.5), (6.5, 3.5, -22.5)),
        Edge.make_line((6.5, 3.5, -22.5), (6.5, 8.2, -22.5)),
        Edge.make_line((5, 7.2, -22.5), (4.7, 7.2, -22.5)),
        Edge.make_line((4.7, 7.2, -22.5), (5.7, 8.2, -22.5)),
        Edge.make_line((5, 3.5, -22.5), (5, 5.5, -22.5)),
    ]
    cirpattern6_6_to = [
        Edge.make_line((5, 5.5, -17.5), (5, 7.2, -17.5)),
        Edge.make_line((6.5, 8.2, -17.5), (5.7, 8.2, -17.5)),
        Edge.make_line((5, 3.5, -17.5), (6.5, 3.5, -17.5)),
        Edge.make_line((6.5, 3.5, -17.5), (6.5, 8.2, -17.5)),
        Edge.make_line((5, 7.2, -17.5), (4.7, 7.2, -17.5)),
        Edge.make_line((4.7, 7.2, -17.5), (5.7, 8.2, -17.5)),
        Edge.make_line((5, 3.5, -17.5), (5, 5.5, -17.5)),
    ]
    cirpattern6_6 = Solid(Shell([*[Face.make_surface_from_curves(cirpattern6_6_from[k], cirpattern6_6_to[k]) for k in range(7)], Face(Wire(cirpattern6_6_from)), Face(Wire(cirpattern6_6_to))]))
    add(cirpattern6_6)

    # Fillet2
    fillet2_edges = [part.edges().sort_by_distance(p)[0] for p in [
        (-5, 4.5, 22.5),
        (-5, 4.5, 17.5),
        (-5, 3.5, 20),
        (22.5, 4.5, 5),
        (17.5, 4.5, 5),
        (20, 3.5, 5),
        (5, 4.5, -17.5),
        (5, 4.5, -22.5),
        (5, 3.5, -20),
        (-22.5, 4.5, -5),
        (-17.5, 4.5, -5),
        (-20, 3.5, -5),
        (17.5, 4.5, -5),
        (22.5, 4.5, -5),
        (20, 3.5, -5),
        (-5, 4.5, -22.5),
        (-5, 4.5, -17.5),
        (-5, 3.5, -20),
        (-22.5, 4.5, 5),
        (-17.5, 4.5, 5),
        (-20, 3.5, 5),
        (5, 4.5, 22.5),
        (5, 4.5, 17.5),
        (5, 3.5, 20),
    ]]
    fillet(fillet2_edges, radius=FILLET2_R)

    # Sketch13 → Cut-Extrude6 (cut)
    with BuildSketch(Plane.ZY.offset(-5)):
        with Locations((20, 6.35)):
            Rectangle(SKETCH13_W, SKETCH13_H)
    cut_extrude6 = extrude(amount=-CUT_EXTRUDE6_DEPTH, mode=Mode.SUBTRACT)

    # Sketch9 → Boss-Extrude8 (add)
    with BuildSketch(Plane(origin=(0, 0, -5), x_dir=(-1, 0, 0), z_dir=(0, 0, -1))):
        with Locations((-19.5, 0.75)):
            Rectangle(SKETCH9_W, SKETCH9_H)
    boss_extrude8 = extrude(amount=BOSS_EXTRUDE8_DEPTH)

    # Sketch11 → Cut-Extrude5 (cut, up to next)
    with BuildSketch(Plane.XZ, mode=Mode.PRIVATE) as cut_extrude5_sk1:
        with Locations(Location((19.5, -8.5, 0), (0, 0, 270))):
            Circle(SKETCH11_R)
    cut_extrude5_tool1 = extrude(cut_extrude5_sk1.sketch, amount=-CUT_EXTRUDE5_REACH, mode=Mode.PRIVATE) & part.part
    cut_extrude5 = cut_extrude5_tool1.solids().sort_by_distance((19.5, 0, -8.5))[0]
    add(cut_extrude5, mode=Mode.SUBTRACT)

    # Mirror3: Boss-Extrude8, Cut-Extrude5 across plane
    add(boss_extrude8.mirror(Plane.XY))
    add(cut_extrude5.mirror(Plane.XY), mode=Mode.SUBTRACT)

    # CirPattern12: Boss-Extrude8, Cut-Extrude5 ×2 about axis
    cirpattern12_axis = Axis((0, 0, 0), (0, 1, 0))
    add([boss_extrude8.rotate(cirpattern12_axis, i * CIRPATTERN12_ANGLE / (CIRPATTERN12_COUNT - 1)) for i in range(1, CIRPATTERN12_COUNT)])
    add([cut_extrude5.rotate(cirpattern12_axis, i * CIRPATTERN12_ANGLE / (CIRPATTERN12_COUNT - 1)) for i in range(1, CIRPATTERN12_COUNT)], mode=Mode.SUBTRACT)

    # CirPattern12 copy 1 sketch → CirPattern12 copy 1 (add)
    with BuildSketch(Plane(origin=(5, 0, 0), x_dir=(0, 0, 1), z_dir=(1, 0, 0))):
        with Locations((-19.5, -0.75)):
            Rectangle(CIRPATTERN12_COPY_1_SKETCH_W, CIRPATTERN12_COPY_1_SKETCH_H)
    extrude(amount=CIRPATTERN12_COPY_1_DEPTH)

    # CirPattern12 copy 2 sketch → CirPattern12 copy 2 (cut, up to next)
    with BuildSketch(Plane(origin=(0, 0, 0), x_dir=(0, 0, -1), z_dir=(0, -1, 0)), mode=Mode.PRIVATE) as cirpattern12_copy_2_sk1:
        with Locations((19.5, 8.5)):
            Circle(CIRPATTERN12_COPY_2_SKETCH_R)
    cirpattern12_copy_2_tool1 = extrude(cirpattern12_copy_2_sk1.sketch, amount=-CIRPATTERN12_COPY_2_REACH, mode=Mode.PRIVATE) & part.part
    add(cirpattern12_copy_2_tool1.solids().sort_by_distance((8.5, 0, -19.5))[0], mode=Mode.SUBTRACT)

    # Fillet4
    fillet4_edges = [part.edges().sort_by_distance(p)[0] for p in [
        (14, 0.75, -11),
        (25, 0.75, -11),
        (14, 0.75, 11),
        (25, 0.75, 11),
        (11, 0.75, -14),
        (11, 0.75, -25),
        (-11, 0.75, -14),
        (-11, 0.75, -25),
    ]]
    fillet(fillet4_edges, radius=FILLET4_R)

    # Mirror4: Cut-Extrude6 across plane
    add(cut_extrude6.mirror(Plane(origin=(0, 0, 0), x_dir=(0, 0, 1), z_dir=(1, 0, 0))), mode=Mode.SUBTRACT)

    # CirPattern14: Cut-Extrude6 ×4 about axis
    cirpattern14_axis = Axis((0, 0, 0), (0, 1, 0))
    for i in range(1, CIRPATTERN14_COUNT):
        add(cut_extrude6.rotate(cirpattern14_axis, i * 360 / CIRPATTERN14_COUNT), mode=Mode.SUBTRACT)

    # CirPattern14 copy 1 sketch → CirPattern14 copy 1 (cut)
    with BuildSketch(Plane(origin=(0, 0, 5), x_dir=(1, 0, 0), z_dir=(0, 0, -1))):
        with Locations((20, -6.35)):
            Rectangle(CIRPATTERN14_COPY_1_SKETCH_W, CIRPATTERN14_COPY_1_SKETCH_H)
    extrude(amount=-CIRPATTERN14_COPY_1_DEPTH, mode=Mode.SUBTRACT)

    # CirPattern14 copy 2 sketch → CirPattern14 copy 2 (cut)
    with BuildSketch(Plane(origin=(5, 0, 0), x_dir=(0, 0, -1), z_dir=(-1, 0, 0))):
        with Locations((20, -6.35)):
            Rectangle(CIRPATTERN14_COPY_2_SKETCH_W, CIRPATTERN14_COPY_2_SKETCH_H)
    extrude(amount=-CIRPATTERN14_COPY_2_DEPTH, mode=Mode.SUBTRACT)

    # CirPattern14 copy 3 sketch → CirPattern14 copy 3 (cut)
    with BuildSketch(Plane(origin=(0, 0, -5), x_dir=(-1, 0, 0), z_dir=(0, 0, 1))):
        with Locations((20, -6.35)):
            Rectangle(CIRPATTERN14_COPY_3_SKETCH_W, CIRPATTERN14_COPY_3_SKETCH_H)
    extrude(amount=-CIRPATTERN14_COPY_3_DEPTH, mode=Mode.SUBTRACT)

    # Chamfer2: read off the stored shape, not the designer's step
    # Chamfer2 outline → Chamfer2 (cut)
    with BuildSketch(Plane.YZ.offset(CHAMFER2_START)):
        with BuildLine():
            Line((5.5, 2.507987241), (5.5, 2.818415652))
            Line((5.5, 2.818415652), (4.974212995, 2.227548881))
            ThreePointArc((4.974212995, 2.227548881), (5.229346067, 2.382317902), (5.5, 2.507987241))
        make_face()
        with BuildLine():
            ThreePointArc((5.5, -2.507987241), (5.229346067, -2.382317902), (4.974212995, -2.227548881))
            Line((4.974212995, -2.227548881), (5.5, -2.818415652))
            Line((5.5, -2.818415652), (5.5, -2.507987241))
        make_face()
    extrude(amount=CHAMFER2_DEPTH, mode=Mode.SUBTRACT)

    # Chamfer2 2 outline → Chamfer2 2 (cut)
    with BuildSketch(Plane.XY.offset(CHAMFER2_START)):
        with BuildLine():
            ThreePointArc((2.670205985, 5.5), (2.629105515, 5.285342215), (2.570778016, 5.074711932))
            Line((2.570778016, 5.074711932), (3.145933741, 5.5))
            Line((3.145933741, 5.5), (2.670205985, 5.5))
        make_face()
        with BuildLine():
            Line((-3.145933741, 5.5), (-2.570778016, 5.074711932))
            ThreePointArc((-2.570778016, 5.074711932), (-2.629105515, 5.285342215), (-2.670205985, 5.5))
            Line((-2.670205985, 5.5), (-3.145933741, 5.5))
        make_face()
    extrude(amount=CHAMFER2_2_DEPTH, mode=Mode.SUBTRACT)


solid = part.part
